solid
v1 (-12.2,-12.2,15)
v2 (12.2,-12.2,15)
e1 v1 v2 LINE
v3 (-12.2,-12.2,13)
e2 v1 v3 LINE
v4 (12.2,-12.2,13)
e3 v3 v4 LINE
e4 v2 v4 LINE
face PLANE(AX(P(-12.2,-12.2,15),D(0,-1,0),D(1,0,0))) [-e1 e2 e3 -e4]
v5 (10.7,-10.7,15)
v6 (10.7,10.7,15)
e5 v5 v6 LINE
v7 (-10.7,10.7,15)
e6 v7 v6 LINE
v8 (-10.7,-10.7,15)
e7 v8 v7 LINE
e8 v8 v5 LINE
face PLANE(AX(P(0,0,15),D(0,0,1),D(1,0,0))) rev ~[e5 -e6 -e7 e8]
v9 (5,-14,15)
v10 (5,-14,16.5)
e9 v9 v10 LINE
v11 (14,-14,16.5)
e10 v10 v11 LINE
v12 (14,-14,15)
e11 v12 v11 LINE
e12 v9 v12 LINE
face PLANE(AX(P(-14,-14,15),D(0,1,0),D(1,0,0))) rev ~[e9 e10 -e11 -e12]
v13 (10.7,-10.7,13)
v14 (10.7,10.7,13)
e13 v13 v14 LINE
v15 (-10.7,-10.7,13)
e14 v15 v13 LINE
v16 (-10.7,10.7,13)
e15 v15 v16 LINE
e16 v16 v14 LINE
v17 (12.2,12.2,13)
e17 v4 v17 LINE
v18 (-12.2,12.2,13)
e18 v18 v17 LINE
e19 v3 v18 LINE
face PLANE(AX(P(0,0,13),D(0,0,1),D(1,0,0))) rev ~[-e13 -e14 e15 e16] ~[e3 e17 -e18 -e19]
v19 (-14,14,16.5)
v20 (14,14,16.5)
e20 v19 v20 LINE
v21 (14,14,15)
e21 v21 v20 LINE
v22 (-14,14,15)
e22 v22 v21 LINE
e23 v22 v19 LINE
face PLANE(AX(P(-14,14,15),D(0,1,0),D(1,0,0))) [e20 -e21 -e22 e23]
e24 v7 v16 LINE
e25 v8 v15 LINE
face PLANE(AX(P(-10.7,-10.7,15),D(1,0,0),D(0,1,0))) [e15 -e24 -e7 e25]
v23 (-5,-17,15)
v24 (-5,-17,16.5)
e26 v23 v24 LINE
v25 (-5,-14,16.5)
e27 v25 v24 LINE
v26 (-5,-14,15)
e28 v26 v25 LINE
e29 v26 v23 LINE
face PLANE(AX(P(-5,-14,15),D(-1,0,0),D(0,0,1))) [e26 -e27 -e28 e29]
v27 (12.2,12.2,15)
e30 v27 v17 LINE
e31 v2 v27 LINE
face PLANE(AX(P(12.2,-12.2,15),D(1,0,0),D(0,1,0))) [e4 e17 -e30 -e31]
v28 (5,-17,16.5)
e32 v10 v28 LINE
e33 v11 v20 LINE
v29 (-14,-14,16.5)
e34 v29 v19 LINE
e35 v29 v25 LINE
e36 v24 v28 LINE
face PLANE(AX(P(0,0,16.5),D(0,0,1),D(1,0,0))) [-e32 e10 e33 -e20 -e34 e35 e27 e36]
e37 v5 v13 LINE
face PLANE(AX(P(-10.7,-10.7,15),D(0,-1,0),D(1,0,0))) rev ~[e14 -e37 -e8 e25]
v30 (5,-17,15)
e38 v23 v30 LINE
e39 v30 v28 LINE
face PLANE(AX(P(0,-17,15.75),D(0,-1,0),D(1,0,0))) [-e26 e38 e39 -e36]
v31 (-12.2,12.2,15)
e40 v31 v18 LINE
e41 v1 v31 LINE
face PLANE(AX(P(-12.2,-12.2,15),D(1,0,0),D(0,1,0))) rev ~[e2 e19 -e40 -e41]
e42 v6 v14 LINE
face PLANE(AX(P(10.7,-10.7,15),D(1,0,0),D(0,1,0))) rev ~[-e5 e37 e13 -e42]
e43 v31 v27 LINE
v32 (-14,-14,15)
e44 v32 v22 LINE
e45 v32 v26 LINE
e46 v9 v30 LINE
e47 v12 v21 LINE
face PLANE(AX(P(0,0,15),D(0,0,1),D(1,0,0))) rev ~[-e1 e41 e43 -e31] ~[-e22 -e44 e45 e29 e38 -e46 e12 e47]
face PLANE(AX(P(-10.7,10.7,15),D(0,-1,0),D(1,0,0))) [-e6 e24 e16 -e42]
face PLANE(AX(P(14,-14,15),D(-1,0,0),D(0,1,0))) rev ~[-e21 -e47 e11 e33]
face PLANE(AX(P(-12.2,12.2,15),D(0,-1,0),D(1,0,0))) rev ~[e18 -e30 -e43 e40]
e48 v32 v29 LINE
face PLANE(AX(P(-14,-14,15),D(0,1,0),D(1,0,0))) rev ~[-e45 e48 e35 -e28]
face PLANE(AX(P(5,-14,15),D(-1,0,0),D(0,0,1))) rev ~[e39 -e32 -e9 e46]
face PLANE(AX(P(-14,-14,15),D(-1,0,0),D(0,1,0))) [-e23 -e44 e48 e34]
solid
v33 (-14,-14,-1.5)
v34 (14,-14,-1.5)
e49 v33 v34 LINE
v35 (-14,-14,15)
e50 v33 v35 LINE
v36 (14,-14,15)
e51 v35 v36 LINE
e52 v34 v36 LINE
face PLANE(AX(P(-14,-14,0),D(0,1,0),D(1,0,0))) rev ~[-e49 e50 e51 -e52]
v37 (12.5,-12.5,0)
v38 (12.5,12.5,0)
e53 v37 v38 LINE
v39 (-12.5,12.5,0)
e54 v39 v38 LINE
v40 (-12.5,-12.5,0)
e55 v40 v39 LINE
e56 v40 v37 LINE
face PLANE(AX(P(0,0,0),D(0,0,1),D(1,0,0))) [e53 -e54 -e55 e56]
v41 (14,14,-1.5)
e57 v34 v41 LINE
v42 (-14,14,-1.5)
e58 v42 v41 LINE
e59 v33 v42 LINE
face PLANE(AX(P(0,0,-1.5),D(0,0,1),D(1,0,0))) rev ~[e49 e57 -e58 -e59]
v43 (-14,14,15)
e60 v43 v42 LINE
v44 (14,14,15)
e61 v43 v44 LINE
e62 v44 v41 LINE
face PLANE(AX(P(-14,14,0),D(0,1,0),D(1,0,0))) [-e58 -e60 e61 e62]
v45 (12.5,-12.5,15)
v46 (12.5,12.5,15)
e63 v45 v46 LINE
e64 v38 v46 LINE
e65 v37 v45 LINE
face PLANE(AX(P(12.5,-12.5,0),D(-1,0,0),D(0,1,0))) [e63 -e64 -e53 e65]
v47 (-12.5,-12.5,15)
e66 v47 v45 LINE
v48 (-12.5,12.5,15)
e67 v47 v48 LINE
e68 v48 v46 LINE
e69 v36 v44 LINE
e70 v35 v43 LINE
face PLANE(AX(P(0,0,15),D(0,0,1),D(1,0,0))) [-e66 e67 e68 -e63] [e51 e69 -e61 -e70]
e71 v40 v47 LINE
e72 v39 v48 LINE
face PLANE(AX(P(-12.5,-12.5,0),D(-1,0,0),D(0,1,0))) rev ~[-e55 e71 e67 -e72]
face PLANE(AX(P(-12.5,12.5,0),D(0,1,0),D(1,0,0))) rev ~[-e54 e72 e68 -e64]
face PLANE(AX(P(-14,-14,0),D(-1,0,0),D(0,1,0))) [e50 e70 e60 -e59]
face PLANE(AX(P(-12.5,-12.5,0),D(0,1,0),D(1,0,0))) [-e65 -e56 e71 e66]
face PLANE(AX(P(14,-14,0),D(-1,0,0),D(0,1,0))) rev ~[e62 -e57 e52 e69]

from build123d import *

# Parameters (mm, degrees)
F0_W     = 28
F0_H     = 28
F0_W_2   = 25
F0_H_2   = 25
F1_DEPTH = 1.5
F2_DEPTH = 15
F3_W     = 24.4
F3_H     = 24.4
F3_W_2   = 21.4
F3_H_2   = 21.4
F4_DEPTH = 2
F3_W_3   = 28
F3_H_3   = 28
F3_W_4   = 25
F3_H_4   = 25
F5_DEPTH = 1.5
F6_W     = 10
F6_H     = 1.5
F7_DEPTH = 3


with BuildPart() as f1:
    # F0 (on Top) → F1 (new body)
    with BuildSketch(Plane.XY):
        Rectangle(F0_W, F0_H)
        Rectangle(F0_W_2, F0_H_2, mode=Mode.SUBTRACT)
        Rectangle(F0_W_2, F0_H_2)
    extrude(amount=-F1_DEPTH)

    # F0 (on Top) → F2 (join)
    with BuildSketch(Plane.XY):
        Rectangle(F0_W, F0_H)
        Rectangle(F0_W_2, F0_H_2, mode=Mode.SUBTRACT)
    extrude(amount=F2_DEPTH)


with BuildPart() as f4:
    # F3 (on face) → F4 (new body)
    with BuildSketch(Plane.XY.offset(15)):
        Rectangle(F3_W, F3_H)
        Rectangle(F3_W_2, F3_H_2, mode=Mode.SUBTRACT)
    extrude(amount=-F4_DEPTH)

    # F3 (on face) → F5 (join)
    with BuildSketch(Plane.XY.offset(15)):
        Rectangle(F3_W_3, F3_H_3)
        Rectangle(F3_W_4, F3_H_4, mode=Mode.SUBTRACT)
        Rectangle(F3_W_4, F3_H_4)
        Rectangle(F3_W, F3_H, mode=Mode.SUBTRACT)
        Rectangle(F3_W, F3_H)
        Rectangle(F3_W_2, F3_H_2, mode=Mode.SUBTRACT)
        Rectangle(F3_W_2, F3_H_2)
    extrude(amount=F5_DEPTH)

    # F6 (on face) → F7 (join)
    with BuildSketch(Plane.XZ.offset(14)):
        with Locations((0, 15.75)):
            Rectangle(F6_W, F6_H)
    extrude(amount=F7_DEPTH)


solid = Compound([f1.part, f4.part])
